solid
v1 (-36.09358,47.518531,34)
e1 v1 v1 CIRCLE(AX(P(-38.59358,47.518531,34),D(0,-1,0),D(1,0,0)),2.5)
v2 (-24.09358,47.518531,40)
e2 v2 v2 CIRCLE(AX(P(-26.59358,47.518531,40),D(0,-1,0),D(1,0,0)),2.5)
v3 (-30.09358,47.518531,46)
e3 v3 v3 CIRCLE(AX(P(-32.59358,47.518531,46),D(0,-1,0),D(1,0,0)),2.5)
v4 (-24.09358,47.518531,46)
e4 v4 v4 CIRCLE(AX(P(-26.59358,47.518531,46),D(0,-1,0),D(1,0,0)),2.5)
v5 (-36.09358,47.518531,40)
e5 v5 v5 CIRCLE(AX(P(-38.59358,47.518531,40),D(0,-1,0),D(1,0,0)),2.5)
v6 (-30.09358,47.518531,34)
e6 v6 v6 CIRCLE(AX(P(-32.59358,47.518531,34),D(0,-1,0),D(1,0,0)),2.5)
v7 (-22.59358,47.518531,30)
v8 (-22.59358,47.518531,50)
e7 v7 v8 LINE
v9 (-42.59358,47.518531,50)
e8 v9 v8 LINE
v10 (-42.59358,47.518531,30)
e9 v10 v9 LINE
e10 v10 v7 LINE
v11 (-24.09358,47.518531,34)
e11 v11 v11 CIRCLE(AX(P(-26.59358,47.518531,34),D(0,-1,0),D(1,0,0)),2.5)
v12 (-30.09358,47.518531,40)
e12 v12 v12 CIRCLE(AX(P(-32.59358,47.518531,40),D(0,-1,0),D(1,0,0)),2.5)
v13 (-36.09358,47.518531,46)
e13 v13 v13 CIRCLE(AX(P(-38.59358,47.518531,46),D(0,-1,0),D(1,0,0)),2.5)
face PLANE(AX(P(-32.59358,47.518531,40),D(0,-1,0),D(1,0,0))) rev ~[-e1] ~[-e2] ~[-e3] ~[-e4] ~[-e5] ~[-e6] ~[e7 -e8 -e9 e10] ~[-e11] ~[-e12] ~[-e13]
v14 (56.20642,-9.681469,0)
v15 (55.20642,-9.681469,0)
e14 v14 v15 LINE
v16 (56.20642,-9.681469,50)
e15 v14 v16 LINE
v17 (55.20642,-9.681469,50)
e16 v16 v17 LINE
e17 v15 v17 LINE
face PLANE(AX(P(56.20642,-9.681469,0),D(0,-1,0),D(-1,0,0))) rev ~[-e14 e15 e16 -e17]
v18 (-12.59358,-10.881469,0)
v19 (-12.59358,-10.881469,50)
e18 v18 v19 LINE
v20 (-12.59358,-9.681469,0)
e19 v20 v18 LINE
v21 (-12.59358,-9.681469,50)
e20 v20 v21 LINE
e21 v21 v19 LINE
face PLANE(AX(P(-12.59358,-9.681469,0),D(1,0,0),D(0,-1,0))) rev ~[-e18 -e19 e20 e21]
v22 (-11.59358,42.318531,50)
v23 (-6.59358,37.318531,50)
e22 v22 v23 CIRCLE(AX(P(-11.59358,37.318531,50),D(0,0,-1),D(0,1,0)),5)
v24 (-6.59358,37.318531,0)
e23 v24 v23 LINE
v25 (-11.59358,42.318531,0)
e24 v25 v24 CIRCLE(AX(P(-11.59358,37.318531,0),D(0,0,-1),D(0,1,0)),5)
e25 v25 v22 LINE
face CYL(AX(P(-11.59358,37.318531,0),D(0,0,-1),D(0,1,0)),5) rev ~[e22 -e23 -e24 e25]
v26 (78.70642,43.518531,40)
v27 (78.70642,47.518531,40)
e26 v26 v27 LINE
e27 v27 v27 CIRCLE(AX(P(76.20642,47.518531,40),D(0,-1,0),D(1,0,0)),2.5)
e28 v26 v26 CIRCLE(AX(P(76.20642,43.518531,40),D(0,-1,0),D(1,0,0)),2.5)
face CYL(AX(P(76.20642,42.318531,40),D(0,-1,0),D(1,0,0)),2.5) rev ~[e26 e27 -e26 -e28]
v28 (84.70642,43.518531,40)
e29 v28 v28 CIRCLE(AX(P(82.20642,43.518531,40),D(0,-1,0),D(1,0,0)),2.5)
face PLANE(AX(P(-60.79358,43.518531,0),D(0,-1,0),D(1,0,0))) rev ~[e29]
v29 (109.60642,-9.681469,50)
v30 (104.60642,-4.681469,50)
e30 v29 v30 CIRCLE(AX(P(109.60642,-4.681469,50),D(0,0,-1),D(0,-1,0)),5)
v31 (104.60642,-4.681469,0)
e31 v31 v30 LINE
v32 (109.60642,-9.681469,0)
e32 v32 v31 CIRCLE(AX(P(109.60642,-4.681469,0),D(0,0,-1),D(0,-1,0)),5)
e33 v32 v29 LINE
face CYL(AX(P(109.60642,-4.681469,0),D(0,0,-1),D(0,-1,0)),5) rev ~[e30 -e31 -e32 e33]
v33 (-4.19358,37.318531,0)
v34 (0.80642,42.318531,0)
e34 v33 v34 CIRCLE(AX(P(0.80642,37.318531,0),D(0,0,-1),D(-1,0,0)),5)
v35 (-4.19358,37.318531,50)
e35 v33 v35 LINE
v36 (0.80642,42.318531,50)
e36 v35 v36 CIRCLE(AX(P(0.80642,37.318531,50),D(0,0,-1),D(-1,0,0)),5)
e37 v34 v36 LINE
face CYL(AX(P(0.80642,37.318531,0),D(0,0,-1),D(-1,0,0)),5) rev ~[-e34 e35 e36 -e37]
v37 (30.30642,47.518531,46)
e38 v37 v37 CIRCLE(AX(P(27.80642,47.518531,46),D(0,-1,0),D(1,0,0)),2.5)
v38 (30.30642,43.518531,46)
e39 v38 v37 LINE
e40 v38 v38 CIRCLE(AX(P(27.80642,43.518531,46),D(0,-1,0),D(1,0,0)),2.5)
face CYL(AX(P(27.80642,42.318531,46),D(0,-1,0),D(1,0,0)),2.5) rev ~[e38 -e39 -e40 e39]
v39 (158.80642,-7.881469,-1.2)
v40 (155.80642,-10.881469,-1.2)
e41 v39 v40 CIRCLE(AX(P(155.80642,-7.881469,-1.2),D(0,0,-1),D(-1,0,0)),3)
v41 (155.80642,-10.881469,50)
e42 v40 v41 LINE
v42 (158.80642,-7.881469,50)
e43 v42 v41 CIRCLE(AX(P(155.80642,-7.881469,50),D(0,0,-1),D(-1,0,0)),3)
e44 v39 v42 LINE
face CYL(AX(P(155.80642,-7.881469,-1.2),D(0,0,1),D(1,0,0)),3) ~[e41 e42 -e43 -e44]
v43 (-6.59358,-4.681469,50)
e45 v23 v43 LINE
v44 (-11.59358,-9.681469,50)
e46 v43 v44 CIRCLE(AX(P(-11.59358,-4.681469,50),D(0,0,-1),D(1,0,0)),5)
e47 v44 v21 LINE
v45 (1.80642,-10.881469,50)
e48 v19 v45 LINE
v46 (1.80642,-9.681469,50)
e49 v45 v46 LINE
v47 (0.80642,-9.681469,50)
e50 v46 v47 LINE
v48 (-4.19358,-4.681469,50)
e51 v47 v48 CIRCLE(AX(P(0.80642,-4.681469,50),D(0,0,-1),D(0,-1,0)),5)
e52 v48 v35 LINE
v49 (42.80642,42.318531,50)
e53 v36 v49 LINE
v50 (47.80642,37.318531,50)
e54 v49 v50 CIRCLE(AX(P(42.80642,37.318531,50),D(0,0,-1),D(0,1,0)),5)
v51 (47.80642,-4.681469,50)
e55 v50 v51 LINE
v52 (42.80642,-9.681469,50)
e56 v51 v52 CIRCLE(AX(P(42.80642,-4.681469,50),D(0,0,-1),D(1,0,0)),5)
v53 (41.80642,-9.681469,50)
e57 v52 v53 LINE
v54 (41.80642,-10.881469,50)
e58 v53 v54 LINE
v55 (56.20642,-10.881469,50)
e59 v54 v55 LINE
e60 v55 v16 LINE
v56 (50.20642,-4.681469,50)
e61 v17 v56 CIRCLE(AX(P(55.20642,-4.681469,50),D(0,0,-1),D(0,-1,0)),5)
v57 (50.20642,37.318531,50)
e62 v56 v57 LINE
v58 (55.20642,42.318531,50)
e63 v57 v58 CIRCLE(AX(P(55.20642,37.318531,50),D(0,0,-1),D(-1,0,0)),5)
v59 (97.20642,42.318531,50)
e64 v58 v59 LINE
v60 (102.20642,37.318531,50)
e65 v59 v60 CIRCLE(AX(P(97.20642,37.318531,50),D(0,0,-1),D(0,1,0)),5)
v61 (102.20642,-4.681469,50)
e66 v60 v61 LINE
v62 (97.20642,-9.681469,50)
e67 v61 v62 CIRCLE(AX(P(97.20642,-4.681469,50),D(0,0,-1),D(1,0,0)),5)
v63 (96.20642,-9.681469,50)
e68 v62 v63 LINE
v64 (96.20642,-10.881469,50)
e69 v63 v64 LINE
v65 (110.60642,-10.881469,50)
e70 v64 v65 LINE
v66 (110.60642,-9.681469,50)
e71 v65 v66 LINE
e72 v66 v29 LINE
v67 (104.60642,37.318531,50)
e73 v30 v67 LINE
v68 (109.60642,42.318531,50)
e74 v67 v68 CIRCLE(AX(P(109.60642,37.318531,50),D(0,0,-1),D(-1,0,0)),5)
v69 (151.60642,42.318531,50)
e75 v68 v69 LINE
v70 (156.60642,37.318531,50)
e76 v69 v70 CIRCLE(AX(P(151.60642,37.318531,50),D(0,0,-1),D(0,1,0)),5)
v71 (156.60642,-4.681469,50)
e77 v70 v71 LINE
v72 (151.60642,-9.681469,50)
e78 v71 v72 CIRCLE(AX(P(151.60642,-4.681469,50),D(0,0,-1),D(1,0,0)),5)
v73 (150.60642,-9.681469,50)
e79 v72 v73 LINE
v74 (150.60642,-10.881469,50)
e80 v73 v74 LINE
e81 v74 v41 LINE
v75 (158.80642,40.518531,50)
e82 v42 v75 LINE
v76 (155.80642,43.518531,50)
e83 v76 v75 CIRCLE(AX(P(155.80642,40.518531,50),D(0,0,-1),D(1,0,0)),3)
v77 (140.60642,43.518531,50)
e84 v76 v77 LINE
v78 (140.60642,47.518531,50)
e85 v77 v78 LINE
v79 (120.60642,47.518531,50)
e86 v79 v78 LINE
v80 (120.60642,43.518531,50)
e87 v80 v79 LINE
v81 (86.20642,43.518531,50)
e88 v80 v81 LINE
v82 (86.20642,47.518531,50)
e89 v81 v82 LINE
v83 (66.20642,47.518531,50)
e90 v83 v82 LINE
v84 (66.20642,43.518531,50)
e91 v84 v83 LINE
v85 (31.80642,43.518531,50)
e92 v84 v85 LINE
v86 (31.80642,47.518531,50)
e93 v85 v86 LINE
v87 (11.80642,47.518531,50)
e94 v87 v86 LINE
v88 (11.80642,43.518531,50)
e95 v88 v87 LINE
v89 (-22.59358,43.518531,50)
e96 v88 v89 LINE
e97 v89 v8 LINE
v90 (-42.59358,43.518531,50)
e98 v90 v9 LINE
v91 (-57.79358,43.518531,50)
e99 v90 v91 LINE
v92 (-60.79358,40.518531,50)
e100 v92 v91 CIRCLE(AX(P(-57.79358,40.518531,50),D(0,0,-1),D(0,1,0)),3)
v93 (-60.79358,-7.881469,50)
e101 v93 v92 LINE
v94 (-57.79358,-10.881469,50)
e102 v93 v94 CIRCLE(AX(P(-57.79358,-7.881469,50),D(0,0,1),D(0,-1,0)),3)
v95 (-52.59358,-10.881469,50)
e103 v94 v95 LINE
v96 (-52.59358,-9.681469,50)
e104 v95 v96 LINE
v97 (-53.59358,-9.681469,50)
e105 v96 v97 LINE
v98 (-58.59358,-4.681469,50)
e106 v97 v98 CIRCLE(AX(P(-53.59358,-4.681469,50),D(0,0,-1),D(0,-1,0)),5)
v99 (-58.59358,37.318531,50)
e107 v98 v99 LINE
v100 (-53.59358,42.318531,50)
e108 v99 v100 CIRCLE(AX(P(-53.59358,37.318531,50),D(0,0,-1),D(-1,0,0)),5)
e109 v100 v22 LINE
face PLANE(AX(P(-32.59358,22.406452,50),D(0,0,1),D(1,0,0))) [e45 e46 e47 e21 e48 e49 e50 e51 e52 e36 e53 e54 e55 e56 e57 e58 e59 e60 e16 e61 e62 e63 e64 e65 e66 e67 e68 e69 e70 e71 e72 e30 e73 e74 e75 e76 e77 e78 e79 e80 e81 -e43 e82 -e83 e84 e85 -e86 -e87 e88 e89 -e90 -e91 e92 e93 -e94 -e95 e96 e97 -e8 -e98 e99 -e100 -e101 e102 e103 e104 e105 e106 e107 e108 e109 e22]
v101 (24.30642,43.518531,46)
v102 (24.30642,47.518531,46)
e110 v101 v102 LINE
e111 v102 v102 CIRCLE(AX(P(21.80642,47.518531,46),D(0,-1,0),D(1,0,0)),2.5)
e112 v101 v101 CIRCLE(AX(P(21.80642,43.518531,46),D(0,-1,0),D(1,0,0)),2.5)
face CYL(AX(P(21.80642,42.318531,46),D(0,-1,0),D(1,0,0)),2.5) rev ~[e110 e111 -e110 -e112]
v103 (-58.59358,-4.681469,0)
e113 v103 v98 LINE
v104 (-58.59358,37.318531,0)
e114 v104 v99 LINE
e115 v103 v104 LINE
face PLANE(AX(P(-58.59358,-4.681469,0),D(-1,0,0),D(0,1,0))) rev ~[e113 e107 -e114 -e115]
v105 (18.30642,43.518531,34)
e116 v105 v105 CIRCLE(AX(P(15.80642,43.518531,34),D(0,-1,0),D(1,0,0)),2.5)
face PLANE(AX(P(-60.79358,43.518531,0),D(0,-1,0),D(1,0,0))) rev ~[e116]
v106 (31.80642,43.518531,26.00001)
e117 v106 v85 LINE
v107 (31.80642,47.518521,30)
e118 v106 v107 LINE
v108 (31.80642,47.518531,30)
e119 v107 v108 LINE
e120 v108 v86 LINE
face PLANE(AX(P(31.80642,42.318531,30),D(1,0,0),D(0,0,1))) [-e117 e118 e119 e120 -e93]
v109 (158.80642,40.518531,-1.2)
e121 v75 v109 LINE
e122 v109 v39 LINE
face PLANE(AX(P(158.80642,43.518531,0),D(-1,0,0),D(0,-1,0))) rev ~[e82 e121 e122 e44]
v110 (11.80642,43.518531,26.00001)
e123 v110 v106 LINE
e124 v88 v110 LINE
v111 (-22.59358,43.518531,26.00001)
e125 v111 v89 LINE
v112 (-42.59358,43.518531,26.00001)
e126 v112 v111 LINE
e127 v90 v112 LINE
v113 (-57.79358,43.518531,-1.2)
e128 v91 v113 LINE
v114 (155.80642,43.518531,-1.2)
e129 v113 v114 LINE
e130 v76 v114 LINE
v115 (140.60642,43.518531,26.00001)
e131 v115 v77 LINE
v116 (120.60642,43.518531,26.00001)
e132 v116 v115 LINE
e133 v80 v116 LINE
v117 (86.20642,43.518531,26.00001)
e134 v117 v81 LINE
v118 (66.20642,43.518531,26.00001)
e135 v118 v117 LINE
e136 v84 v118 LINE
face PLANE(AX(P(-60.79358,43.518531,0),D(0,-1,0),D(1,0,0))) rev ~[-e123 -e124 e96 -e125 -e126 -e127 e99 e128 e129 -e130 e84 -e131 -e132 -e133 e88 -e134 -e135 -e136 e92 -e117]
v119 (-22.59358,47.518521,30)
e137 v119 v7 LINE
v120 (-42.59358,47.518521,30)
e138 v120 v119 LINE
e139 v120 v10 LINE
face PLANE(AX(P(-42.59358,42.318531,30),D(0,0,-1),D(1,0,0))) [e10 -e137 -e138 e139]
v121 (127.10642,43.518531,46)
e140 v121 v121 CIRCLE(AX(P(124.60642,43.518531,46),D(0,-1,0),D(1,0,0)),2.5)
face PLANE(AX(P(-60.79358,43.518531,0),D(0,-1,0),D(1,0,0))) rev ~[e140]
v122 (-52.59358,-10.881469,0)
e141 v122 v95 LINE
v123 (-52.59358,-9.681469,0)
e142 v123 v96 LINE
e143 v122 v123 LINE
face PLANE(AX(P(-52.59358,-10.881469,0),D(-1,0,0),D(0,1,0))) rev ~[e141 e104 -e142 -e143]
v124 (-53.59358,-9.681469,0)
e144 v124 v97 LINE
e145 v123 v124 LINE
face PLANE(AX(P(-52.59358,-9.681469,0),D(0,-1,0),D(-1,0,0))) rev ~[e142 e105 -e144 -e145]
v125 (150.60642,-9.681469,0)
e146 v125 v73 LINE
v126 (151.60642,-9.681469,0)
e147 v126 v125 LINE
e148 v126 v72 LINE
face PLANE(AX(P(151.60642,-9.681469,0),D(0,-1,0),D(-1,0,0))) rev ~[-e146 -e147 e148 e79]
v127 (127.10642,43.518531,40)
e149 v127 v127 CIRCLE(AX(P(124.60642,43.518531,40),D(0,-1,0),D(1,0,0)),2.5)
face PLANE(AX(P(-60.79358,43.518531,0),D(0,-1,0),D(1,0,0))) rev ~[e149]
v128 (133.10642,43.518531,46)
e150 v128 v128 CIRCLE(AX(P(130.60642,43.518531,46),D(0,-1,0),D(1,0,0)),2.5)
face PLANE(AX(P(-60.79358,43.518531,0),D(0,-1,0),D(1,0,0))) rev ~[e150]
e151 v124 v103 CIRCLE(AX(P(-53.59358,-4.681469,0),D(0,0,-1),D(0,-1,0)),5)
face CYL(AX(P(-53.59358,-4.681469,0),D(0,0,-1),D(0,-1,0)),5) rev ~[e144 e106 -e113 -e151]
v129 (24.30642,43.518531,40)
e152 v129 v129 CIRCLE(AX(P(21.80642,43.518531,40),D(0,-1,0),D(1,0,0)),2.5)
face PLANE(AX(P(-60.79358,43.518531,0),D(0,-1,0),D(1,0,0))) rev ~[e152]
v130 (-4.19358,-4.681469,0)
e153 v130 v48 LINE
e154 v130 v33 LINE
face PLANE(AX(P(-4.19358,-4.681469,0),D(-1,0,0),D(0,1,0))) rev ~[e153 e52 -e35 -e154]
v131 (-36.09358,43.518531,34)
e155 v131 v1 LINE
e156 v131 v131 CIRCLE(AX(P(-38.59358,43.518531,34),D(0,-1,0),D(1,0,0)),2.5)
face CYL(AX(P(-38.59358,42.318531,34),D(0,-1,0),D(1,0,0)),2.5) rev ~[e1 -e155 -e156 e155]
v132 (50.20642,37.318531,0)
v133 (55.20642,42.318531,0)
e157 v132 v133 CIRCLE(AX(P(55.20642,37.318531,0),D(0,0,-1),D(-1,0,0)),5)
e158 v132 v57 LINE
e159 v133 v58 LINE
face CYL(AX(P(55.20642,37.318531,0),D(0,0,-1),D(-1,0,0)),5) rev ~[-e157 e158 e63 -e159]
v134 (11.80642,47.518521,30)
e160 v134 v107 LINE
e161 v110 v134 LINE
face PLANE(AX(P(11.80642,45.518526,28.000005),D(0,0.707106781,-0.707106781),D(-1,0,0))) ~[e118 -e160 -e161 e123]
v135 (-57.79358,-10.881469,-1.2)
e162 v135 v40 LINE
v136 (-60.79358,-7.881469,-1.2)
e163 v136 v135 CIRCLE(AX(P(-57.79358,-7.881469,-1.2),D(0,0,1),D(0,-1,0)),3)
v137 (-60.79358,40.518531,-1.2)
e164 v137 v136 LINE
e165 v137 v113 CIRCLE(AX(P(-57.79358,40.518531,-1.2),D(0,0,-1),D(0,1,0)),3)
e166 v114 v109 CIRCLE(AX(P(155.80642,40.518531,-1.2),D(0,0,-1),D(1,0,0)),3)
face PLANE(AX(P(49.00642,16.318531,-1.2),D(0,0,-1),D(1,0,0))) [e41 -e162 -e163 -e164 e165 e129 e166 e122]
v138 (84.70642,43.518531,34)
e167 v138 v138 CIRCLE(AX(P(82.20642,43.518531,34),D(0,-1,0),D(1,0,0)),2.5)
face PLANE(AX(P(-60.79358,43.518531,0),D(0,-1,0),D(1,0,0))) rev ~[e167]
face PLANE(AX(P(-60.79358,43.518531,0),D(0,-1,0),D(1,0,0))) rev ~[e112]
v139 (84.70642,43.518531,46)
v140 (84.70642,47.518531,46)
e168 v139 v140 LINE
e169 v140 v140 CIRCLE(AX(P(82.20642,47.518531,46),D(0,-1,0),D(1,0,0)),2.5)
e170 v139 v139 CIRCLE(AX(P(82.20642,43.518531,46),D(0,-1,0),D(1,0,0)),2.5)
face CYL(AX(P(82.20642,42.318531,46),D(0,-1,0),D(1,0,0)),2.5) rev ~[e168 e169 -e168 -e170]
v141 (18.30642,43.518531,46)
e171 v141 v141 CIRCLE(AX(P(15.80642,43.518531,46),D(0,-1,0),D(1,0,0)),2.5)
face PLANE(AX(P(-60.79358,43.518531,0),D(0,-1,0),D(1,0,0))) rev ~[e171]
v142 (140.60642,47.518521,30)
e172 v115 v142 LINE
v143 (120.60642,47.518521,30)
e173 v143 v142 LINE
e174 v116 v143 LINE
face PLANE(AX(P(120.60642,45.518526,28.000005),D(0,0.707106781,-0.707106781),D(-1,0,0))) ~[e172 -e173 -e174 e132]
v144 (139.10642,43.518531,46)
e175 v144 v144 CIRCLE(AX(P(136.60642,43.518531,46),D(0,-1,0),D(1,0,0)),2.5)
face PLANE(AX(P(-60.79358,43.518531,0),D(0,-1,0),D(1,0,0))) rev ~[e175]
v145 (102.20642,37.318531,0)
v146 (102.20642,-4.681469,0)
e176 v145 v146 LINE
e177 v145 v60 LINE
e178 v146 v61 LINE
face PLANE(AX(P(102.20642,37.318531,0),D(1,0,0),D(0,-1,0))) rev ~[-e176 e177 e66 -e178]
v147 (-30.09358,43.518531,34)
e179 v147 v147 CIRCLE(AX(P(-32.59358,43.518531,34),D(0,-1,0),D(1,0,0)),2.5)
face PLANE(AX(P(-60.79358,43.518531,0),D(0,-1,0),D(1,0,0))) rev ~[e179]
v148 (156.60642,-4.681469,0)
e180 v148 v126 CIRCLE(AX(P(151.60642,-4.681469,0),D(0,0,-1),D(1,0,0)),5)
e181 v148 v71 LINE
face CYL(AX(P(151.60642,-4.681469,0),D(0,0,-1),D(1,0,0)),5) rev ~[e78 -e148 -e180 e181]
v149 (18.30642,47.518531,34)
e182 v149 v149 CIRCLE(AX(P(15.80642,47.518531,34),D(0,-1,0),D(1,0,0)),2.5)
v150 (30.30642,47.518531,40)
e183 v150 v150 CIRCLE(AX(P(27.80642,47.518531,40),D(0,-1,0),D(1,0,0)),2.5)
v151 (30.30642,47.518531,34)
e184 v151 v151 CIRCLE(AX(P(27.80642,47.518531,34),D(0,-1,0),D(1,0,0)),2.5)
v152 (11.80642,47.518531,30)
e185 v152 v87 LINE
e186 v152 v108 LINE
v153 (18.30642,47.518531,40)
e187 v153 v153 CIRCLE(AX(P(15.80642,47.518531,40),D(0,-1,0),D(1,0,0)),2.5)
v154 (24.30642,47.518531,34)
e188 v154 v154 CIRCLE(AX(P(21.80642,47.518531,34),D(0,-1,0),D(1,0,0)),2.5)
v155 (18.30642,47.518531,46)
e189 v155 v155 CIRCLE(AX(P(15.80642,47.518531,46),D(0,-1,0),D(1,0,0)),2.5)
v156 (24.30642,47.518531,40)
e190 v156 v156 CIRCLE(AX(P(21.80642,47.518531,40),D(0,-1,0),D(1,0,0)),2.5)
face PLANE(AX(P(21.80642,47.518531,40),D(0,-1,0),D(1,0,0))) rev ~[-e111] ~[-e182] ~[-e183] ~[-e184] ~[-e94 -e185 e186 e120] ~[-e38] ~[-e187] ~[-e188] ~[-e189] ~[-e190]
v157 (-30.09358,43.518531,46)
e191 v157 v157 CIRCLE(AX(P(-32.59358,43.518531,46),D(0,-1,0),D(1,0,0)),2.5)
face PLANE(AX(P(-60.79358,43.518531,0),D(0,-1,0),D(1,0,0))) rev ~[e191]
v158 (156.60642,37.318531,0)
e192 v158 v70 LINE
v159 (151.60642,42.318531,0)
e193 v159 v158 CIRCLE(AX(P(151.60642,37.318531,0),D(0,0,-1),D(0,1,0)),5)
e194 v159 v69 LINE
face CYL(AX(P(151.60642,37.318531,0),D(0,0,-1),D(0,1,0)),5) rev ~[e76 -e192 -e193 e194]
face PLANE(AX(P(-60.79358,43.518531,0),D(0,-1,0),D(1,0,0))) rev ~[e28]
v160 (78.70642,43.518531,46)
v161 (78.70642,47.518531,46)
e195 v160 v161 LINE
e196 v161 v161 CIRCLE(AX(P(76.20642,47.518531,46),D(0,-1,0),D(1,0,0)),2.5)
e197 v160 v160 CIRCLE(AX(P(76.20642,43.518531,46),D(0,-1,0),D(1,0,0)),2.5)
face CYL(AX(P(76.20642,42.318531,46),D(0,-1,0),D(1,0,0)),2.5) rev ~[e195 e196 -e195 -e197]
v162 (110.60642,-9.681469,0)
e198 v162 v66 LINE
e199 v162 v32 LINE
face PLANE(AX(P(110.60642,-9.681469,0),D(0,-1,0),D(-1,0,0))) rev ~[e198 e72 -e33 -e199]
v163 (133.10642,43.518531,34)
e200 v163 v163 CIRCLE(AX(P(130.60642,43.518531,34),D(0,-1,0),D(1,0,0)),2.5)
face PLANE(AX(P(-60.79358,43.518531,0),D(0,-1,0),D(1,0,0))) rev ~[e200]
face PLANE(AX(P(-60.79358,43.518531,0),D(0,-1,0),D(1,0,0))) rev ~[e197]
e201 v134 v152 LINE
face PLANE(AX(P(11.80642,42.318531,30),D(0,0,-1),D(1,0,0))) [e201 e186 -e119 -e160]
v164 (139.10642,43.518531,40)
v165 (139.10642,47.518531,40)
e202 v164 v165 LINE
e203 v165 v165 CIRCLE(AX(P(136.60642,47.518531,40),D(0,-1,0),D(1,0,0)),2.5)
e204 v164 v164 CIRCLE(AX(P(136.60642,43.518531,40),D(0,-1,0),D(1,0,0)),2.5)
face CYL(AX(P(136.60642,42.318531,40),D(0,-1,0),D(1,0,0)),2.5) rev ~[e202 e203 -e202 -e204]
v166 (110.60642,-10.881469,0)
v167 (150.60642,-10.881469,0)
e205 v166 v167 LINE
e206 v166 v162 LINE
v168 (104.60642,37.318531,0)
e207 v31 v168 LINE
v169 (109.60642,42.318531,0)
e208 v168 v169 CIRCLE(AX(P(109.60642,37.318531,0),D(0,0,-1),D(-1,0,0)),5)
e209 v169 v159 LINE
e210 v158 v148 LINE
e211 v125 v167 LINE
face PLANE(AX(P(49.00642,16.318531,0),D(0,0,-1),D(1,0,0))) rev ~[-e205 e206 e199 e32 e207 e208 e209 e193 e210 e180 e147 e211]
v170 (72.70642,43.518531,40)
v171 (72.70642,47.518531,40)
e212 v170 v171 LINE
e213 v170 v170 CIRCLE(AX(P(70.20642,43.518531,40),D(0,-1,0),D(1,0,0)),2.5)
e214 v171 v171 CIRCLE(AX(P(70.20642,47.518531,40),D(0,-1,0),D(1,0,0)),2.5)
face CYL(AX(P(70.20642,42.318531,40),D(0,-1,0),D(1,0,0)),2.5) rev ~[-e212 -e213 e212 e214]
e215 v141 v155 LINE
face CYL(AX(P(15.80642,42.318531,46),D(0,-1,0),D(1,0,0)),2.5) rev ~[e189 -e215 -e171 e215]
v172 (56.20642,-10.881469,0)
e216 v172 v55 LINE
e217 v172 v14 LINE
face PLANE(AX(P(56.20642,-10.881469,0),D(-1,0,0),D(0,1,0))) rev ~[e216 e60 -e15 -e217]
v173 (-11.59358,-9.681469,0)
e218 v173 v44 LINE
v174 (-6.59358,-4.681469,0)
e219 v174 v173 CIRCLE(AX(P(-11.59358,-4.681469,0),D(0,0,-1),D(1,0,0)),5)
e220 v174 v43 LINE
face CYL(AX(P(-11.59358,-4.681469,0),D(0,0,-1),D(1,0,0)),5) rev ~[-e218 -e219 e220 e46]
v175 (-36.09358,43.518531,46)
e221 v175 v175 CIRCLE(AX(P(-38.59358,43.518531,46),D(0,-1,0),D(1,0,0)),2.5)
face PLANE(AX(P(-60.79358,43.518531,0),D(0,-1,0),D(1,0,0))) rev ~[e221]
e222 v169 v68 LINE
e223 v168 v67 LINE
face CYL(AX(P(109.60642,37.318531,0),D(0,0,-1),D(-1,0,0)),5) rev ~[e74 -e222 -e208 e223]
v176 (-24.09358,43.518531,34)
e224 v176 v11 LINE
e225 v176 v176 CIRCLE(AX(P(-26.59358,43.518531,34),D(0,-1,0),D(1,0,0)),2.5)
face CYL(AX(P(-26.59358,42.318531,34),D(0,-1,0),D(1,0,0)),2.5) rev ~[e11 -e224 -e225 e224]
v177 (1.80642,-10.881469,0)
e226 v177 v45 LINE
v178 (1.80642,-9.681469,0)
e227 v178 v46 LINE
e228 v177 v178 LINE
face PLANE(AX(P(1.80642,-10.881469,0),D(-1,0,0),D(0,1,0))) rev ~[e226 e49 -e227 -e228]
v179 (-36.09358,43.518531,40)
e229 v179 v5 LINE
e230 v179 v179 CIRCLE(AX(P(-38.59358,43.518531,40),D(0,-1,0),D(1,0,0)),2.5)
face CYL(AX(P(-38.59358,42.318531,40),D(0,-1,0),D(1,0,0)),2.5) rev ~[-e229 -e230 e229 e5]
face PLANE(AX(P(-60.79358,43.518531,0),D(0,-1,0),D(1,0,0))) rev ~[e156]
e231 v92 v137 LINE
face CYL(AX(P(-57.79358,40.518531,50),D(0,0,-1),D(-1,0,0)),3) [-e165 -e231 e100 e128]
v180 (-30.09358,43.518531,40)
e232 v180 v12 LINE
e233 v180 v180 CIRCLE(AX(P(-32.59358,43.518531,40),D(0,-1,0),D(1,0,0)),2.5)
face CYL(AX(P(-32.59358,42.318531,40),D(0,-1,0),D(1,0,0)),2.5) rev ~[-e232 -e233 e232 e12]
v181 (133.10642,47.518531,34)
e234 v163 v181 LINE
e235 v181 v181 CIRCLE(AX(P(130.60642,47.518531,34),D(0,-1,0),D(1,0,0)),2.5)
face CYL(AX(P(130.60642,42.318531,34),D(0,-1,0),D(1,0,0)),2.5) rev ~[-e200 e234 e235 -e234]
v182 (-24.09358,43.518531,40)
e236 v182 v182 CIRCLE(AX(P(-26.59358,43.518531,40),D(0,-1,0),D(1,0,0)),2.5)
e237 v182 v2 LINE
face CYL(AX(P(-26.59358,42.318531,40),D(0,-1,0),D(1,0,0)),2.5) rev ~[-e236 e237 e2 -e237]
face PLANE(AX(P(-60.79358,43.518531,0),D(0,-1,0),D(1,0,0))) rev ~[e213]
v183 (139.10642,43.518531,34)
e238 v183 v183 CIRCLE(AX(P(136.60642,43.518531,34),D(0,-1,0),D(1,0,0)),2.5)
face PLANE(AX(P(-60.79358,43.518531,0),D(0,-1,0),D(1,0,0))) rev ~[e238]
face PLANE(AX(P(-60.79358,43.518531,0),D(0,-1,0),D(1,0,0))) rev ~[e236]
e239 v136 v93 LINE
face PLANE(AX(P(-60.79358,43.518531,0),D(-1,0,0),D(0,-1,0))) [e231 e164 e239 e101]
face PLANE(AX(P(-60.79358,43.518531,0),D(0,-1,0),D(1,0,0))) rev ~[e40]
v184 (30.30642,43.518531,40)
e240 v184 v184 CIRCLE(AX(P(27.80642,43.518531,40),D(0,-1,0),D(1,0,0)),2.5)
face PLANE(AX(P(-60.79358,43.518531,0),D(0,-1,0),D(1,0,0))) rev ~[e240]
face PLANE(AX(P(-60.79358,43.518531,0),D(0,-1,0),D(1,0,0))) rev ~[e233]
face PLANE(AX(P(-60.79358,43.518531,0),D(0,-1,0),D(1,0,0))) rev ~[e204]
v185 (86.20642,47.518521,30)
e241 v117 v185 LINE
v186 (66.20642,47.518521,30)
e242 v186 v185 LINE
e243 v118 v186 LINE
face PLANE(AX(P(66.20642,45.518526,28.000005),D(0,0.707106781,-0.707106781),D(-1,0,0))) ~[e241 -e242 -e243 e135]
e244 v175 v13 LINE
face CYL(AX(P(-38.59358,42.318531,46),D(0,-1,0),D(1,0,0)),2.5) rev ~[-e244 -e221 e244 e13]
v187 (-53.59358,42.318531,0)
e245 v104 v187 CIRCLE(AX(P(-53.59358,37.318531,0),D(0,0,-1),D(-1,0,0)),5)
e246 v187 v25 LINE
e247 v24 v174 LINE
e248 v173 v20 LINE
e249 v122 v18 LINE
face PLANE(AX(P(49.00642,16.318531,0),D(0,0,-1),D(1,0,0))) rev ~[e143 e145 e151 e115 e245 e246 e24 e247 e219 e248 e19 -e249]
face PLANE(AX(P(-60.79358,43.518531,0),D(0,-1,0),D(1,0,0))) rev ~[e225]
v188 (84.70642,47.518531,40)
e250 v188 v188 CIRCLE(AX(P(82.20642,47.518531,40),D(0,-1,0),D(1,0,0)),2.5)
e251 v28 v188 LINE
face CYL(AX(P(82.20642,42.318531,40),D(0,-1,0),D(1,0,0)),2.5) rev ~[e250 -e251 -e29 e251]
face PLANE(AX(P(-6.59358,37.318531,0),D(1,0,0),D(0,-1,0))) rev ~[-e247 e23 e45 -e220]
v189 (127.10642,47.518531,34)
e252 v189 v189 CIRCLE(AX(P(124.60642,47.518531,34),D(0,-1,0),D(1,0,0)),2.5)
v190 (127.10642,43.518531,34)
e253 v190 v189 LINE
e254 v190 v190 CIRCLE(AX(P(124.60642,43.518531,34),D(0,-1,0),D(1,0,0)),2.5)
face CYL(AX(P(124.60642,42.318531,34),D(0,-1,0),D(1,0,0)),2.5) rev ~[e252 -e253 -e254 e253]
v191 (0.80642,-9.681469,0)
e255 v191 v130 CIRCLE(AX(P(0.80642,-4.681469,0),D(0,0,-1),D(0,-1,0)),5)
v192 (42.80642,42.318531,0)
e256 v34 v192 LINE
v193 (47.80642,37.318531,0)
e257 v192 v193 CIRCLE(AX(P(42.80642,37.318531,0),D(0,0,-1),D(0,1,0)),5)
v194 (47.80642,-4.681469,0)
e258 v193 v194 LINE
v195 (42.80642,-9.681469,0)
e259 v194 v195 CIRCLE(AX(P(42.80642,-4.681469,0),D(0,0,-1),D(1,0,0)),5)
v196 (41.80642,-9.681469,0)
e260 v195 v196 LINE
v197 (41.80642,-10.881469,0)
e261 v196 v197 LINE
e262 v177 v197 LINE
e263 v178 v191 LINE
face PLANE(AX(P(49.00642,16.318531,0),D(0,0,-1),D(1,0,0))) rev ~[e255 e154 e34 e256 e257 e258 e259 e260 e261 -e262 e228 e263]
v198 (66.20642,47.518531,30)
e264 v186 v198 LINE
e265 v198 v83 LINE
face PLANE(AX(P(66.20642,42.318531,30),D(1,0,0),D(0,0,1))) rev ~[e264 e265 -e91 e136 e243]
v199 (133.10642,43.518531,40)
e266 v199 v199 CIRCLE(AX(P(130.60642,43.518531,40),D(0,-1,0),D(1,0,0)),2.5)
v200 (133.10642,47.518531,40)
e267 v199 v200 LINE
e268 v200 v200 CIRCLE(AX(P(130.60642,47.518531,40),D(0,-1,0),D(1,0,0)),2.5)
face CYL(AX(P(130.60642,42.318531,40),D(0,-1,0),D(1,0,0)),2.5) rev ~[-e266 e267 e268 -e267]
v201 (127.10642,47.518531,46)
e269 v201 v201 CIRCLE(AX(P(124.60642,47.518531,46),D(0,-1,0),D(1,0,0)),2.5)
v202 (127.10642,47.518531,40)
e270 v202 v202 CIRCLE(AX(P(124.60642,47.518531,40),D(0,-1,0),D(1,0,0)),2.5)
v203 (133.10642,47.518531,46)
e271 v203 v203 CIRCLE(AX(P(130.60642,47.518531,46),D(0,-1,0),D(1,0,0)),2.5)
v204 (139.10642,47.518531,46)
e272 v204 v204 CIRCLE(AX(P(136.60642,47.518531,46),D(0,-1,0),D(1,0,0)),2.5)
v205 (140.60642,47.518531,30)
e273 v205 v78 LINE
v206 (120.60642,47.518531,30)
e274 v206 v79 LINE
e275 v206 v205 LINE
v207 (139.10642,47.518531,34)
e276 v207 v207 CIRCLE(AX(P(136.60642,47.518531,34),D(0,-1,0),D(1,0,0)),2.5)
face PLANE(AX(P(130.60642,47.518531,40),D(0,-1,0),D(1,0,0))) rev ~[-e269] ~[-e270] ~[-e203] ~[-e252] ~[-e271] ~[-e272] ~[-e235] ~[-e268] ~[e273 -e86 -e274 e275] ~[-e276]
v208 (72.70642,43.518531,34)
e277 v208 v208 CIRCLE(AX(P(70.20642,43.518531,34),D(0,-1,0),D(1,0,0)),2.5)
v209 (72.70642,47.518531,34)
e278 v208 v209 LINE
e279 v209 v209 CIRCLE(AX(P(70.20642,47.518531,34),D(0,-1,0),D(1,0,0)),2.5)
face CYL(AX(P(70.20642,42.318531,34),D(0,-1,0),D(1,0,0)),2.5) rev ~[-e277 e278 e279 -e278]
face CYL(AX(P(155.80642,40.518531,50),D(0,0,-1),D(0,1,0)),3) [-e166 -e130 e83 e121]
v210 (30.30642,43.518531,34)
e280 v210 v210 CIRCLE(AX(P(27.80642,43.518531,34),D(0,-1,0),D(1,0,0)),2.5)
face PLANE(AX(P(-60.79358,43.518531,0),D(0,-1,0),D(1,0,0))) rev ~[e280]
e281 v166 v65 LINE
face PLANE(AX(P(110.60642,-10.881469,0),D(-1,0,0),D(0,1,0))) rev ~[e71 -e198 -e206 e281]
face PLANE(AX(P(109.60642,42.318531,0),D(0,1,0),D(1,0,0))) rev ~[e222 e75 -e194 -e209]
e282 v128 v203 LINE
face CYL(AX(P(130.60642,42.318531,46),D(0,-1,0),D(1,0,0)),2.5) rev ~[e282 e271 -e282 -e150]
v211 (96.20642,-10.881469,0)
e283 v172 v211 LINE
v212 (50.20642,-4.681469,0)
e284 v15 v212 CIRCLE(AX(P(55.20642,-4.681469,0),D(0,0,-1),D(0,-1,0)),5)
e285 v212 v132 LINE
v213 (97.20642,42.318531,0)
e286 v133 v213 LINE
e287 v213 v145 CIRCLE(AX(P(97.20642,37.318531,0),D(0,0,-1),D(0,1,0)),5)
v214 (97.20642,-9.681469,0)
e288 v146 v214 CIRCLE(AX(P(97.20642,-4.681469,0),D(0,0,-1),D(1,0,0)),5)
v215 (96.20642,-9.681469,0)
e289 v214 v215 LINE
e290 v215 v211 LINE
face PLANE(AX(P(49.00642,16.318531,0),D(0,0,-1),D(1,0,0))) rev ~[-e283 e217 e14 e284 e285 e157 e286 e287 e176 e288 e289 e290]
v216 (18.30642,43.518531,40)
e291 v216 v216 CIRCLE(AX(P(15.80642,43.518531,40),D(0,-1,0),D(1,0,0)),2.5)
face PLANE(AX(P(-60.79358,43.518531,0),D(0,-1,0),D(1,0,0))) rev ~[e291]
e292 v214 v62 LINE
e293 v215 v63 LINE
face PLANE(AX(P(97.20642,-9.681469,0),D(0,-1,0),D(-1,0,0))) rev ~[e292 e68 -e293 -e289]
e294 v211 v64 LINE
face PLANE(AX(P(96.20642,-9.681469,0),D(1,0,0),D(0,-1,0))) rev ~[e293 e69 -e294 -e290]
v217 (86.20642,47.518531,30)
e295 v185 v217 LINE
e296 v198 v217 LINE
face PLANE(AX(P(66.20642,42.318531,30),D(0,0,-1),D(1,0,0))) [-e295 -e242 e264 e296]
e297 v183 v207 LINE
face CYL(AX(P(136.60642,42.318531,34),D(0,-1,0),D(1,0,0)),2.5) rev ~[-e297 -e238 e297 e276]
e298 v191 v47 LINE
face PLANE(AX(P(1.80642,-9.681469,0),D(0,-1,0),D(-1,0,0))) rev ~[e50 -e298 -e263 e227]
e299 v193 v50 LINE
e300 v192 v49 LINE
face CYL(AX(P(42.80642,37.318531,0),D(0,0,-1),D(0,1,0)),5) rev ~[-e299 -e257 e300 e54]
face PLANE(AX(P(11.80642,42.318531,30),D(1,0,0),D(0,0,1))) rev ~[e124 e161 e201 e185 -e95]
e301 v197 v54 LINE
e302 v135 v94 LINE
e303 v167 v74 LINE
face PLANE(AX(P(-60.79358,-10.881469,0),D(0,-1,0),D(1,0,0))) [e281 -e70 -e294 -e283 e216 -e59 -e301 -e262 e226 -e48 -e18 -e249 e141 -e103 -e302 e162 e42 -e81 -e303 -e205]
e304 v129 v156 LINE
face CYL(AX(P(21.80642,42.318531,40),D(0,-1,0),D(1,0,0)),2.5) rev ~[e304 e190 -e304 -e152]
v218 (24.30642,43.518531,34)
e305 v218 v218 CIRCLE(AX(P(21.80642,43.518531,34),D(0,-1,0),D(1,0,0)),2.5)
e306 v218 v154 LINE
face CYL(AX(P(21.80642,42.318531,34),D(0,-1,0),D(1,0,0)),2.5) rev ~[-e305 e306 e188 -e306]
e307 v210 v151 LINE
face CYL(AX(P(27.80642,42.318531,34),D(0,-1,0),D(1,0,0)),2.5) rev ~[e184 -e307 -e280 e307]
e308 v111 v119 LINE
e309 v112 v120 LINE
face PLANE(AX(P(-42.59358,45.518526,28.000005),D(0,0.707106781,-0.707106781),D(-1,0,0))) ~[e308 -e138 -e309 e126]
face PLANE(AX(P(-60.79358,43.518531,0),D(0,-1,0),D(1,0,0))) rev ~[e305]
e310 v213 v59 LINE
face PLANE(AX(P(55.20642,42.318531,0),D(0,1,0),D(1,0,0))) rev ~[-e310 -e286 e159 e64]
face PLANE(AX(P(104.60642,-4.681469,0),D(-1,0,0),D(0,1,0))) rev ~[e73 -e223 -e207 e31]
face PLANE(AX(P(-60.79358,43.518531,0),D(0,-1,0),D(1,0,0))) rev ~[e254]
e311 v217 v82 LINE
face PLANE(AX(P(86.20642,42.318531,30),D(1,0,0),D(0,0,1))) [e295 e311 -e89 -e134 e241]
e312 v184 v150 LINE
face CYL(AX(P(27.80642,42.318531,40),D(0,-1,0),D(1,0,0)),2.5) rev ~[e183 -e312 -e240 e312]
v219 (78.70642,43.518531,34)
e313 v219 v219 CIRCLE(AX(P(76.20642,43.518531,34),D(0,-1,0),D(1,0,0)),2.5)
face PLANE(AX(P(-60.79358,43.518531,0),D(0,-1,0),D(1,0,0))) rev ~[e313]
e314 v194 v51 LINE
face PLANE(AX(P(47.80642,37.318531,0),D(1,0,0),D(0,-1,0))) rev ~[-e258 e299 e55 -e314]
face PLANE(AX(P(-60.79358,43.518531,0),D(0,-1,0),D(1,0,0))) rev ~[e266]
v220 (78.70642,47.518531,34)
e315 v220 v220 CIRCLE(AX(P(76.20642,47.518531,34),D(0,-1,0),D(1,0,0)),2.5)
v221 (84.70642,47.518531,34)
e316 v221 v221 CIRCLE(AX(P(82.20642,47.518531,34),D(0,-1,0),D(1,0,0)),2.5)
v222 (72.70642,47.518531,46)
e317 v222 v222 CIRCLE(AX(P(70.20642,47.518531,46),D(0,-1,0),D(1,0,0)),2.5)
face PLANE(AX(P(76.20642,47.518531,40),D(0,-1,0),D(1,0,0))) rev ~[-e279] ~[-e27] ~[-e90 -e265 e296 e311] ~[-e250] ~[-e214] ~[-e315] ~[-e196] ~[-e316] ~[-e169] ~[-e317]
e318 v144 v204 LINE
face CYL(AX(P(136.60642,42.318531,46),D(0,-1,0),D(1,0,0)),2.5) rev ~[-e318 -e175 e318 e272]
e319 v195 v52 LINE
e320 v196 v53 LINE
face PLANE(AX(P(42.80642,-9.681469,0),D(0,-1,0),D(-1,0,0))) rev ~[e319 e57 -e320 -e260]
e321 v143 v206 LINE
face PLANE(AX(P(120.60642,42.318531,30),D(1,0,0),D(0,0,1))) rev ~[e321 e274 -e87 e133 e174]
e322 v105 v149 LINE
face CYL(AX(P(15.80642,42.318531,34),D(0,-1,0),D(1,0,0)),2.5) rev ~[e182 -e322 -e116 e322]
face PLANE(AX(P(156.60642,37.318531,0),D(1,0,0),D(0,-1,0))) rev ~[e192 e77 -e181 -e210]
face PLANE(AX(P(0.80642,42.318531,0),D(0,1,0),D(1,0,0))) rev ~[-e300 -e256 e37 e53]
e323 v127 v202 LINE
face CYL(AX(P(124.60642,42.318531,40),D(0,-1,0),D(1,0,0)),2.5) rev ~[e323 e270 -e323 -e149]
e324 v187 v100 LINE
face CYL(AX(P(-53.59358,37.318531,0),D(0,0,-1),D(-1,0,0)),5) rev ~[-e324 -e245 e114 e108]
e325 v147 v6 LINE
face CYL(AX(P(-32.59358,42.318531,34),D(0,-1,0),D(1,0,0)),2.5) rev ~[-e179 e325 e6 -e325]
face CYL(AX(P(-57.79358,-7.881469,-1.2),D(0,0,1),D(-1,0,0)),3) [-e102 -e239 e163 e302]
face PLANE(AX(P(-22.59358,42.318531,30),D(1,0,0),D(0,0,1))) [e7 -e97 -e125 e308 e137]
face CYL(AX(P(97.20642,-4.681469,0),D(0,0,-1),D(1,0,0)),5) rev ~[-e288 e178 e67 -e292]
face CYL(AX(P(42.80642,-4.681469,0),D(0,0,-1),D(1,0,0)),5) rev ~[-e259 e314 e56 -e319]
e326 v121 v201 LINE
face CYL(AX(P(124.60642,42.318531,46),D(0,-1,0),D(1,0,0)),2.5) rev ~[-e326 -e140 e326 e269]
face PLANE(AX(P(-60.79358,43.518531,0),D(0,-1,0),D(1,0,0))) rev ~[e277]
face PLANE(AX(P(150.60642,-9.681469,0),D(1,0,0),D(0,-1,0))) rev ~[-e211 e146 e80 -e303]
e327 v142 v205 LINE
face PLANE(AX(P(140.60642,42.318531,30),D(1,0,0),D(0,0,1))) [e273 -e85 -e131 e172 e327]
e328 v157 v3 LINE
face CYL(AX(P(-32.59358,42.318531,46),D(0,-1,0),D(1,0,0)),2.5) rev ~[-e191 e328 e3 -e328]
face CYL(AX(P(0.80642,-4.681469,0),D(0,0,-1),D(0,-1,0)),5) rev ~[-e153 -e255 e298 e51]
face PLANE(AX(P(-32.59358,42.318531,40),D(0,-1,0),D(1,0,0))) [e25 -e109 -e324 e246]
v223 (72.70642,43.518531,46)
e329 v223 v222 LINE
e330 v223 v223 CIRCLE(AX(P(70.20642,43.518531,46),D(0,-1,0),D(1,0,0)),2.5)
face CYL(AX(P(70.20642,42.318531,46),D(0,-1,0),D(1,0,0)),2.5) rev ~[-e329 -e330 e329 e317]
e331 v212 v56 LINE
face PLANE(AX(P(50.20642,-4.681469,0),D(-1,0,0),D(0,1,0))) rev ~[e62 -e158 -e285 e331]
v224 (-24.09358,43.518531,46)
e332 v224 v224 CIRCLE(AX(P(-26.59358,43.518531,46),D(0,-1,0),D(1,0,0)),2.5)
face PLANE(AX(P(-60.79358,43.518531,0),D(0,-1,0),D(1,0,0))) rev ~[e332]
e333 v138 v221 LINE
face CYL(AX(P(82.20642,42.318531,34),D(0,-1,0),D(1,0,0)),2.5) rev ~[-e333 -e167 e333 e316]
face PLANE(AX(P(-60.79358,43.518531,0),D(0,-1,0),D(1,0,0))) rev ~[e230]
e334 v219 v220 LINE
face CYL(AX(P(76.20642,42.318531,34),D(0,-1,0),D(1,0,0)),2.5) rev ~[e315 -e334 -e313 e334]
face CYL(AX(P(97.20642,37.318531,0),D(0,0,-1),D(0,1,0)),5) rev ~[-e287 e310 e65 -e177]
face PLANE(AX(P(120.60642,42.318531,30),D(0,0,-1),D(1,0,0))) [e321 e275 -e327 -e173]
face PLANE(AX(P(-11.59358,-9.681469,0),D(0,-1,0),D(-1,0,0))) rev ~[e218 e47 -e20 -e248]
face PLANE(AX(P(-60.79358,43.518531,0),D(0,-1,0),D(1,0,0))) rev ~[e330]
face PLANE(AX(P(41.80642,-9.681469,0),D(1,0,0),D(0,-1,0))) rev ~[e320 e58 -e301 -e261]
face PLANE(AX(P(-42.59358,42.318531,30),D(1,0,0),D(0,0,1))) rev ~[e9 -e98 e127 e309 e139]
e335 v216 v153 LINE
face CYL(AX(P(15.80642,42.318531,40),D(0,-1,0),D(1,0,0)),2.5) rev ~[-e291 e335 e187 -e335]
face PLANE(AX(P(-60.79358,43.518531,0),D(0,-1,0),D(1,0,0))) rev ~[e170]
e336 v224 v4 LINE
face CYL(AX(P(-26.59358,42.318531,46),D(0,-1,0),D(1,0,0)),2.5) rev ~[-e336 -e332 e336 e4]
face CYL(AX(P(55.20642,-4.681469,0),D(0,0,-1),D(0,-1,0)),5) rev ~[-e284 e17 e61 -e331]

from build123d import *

# Parameters (mm, degrees)
F0_W     = 1
F0_H     = 54.4
F1_DEPTH = 50
F2_W     = 219.6
F2_H     = 54.4
F3_DEPTH = 1.2
F4_W     = 20
F4_H     = 20
F4_R     = 2.5
F5_DEPTH = 5.2
F6_R     = 3
F7_SIZE  = 3.99999


# Not quite as in the source:
# - a fillet or chamfer is up to 0.001 mm smaller than in the source, because OpenCascade refuses the exact size


with BuildPart() as f1:
    # F0 (on Top) → F1 (new body)
    with BuildSketch(Plane.XY):
        with BuildLine():
            Line((-52.5935795337, -9.6814689702), (-53.5935795337, -9.6814689702))
            ThreePointArc((-53.5935795337, -9.6814689702), (-57.1291134396, -8.2170028761), (-58.5935795337, -4.6814689702))
            Line((-58.5935795337, -4.6814689702), (-58.5935795337, 37.3185310298))
            ThreePointArc((-58.5935795337, 37.3185310298), (-57.1291134396, 40.8540649358), (-53.5935795337, 42.3185310298))
            Line((-53.5935795337, 42.3185310298), (-11.5935795337, 42.3185310298))
            ThreePointArc((-11.5935795337, 42.3185310298), (-8.0580456278, 40.8540649358), (-6.5935795337, 37.3185310298))
            Line((-6.5935795337, 37.3185310298), (-6.5935795337, -4.6814689702))
            ThreePointArc((-6.5935795337, -4.6814689702), (-8.0580456278, -8.2170028761), (-11.5935795337, -9.6814689702))
            Line((-11.5935795337, -9.6814689702), (-12.5935795337, -9.6814689702))
            Line((-12.5935795337, -9.6814689702), (-12.5935795337, -10.8814689702))
            Line((-12.5935795337, -10.8814689702), (-5.3935795337, -10.8814689702))
            Line((-5.3935795337, -10.8814689702), (-5.3935795337, 43.5185310298))
            Line((-5.3935795337, 43.5185310298), (-59.7935795337, 43.5185310298))
            Line((-59.7935795337, 43.5185310298), (-59.7935795337, -10.8814689702))
            Line((-59.7935795337, -10.8814689702), (-52.5935795337, -10.8814689702))
            Line((-52.5935795337, -10.8814689702), (-52.5935795337, -9.6814689702))
        make_face()
        with Locations((-60.2935795337, 16.3185310298)):
            Rectangle(F0_W, F0_H)
        with BuildLine():
            Line((49.0064204663, 43.5185310298), (-5.3935795337, 43.5185310298))
            Line((-5.3935795337, 43.5185310298), (-5.3935795337, -10.8814689702))
            Line((-5.3935795337, -10.8814689702), (1.8064204663, -10.8814689702))
            Line((1.8064204663, -10.8814689702), (1.8064204663, -9.6814689702))
            Line((1.8064204663, -9.6814689702), (0.8064204663, -9.6814689702))
            ThreePointArc((0.8064204663, -9.6814689702), (-2.7291134396, -8.2170028761), (-4.1935795337, -4.6814689702))
            Line((-4.1935795337, -4.6814689702), (-4.1935795337, 37.3185310298))
            ThreePointArc((-4.1935795337, 37.3185310298), (-2.7291134396, 40.8540649358), (0.8064204663, 42.3185310298))
            Line((0.8064204663, 42.3185310298), (42.8064204663, 42.3185310298))
            ThreePointArc((42.8064204663, 42.3185310298), (46.3419543722, 40.8540649358), (47.8064204663, 37.3185310298))
            Line((47.8064204663, 37.3185310298), (47.8064204663, -4.6814689702))
            ThreePointArc((47.8064204663, -4.6814689702), (46.3419543722, -8.2170028761), (42.8064204663, -9.6814689702))
            Line((42.8064204663, -9.6814689702), (41.8064204663, -9.6814689702))
            Line((41.8064204663, -9.6814689702), (41.8064204663, -10.8814689702))
            Line((41.8064204663, -10.8814689702), (49.0064204663, -10.8814689702))
            Line((49.0064204663, -10.8814689702), (49.0064204663, 43.5185310298))
        make_face()
        with BuildLine():
            Line((103.4064204663, 43.5185310298), (49.0064204663, 43.5185310298))
            Line((49.0064204663, 43.5185310298), (49.0064204663, -10.8814689702))
            Line((49.0064204663, -10.8814689702), (56.2064204663, -10.8814689702))
            Line((56.2064204663, -10.8814689702), (56.2064204663, -9.6814689702))
            Line((56.2064204663, -9.6814689702), (55.2064204663, -9.6814689702))
            ThreePointArc((55.2064204663, -9.6814689702), (51.6708865604, -8.2170028761), (50.2064204663, -4.6814689702))
            Line((50.2064204663, -4.6814689702), (50.2064204663, 37.3185310298))
            ThreePointArc((50.2064204663, 37.3185310298), (51.6708865604, 40.8540649358), (55.2064204663, 42.3185310298))
            Line((55.2064204663, 42.3185310298), (97.2064204663, 42.3185310298))
            ThreePointArc((97.2064204663, 42.3185310298), (100.7419543722, 40.8540649358), (102.2064204663, 37.3185310298))
            Line((102.2064204663, 37.3185310298), (102.2064204663, -4.6814689702))
            ThreePointArc((102.2064204663, -4.6814689702), (100.7419543722, -8.2170028761), (97.2064204663, -9.6814689702))
            Line((97.2064204663, -9.6814689702), (96.2064204663, -9.6814689702))
            Line((96.2064204663, -9.6814689702), (96.2064204663, -10.8814689702))
            Line((96.2064204663, -10.8814689702), (103.4064204663, -10.8814689702))
            Line((103.4064204663, -10.8814689702), (103.4064204663, 43.5185310298))
        make_face()
        with BuildLine():
            Line((157.8064204663, 43.5185310298), (103.4064204663, 43.5185310298))
            Line((103.4064204663, 43.5185310298), (103.4064204663, -10.8814689702))
            Line((103.4064204663, -10.8814689702), (110.6064204663, -10.8814689702))
            Line((110.6064204663, -10.8814689702), (110.6064204663, -9.6814689702))
            Line((110.6064204663, -9.6814689702), (109.6064204663, -9.6814689702))
            ThreePointArc((109.6064204663, -9.6814689702), (106.0708865604, -8.2170028761), (104.6064204663, -4.6814689702))
            Line((104.6064204663, -4.6814689702), (104.6064204663, 37.3185310298))
            ThreePointArc((104.6064204663, 37.3185310298), (106.0708865604, 40.8540649358), (109.6064204663, 42.3185310298))
            Line((109.6064204663, 42.3185310298), (151.6064204663, 42.3185310298))
            ThreePointArc((151.6064204663, 42.3185310298), (155.1419543722, 40.8540649358), (156.6064204663, 37.3185310298))
            Line((156.6064204663, 37.3185310298), (156.6064204663, -4.6814689702))
            ThreePointArc((156.6064204663, -4.6814689702), (155.1419543722, -8.2170028761), (151.6064204663, -9.6814689702))
            Line((151.6064204663, -9.6814689702), (150.6064204663, -9.6814689702))
            Line((150.6064204663, -9.6814689702), (150.6064204663, -10.8814689702))
            Line((150.6064204663, -10.8814689702), (157.8064204663, -10.8814689702))
            Line((157.8064204663, -10.8814689702), (157.8064204663, 43.5185310298))
        make_face()
        with Locations((158.3064204663, 16.3185310298)):
            Rectangle(F0_W, F0_H)
    extrude(amount=F1_DEPTH)

    # F2 (on face) → F3 (join)
    with BuildSketch(Plane(origin=(0, 0, 0), x_dir=(1, 0, 0), z_dir=(0, 0, -1))):
        with Locations((49.0064204663, -16.3185310298)):
            Rectangle(F2_W, F2_H)
    extrude(amount=F3_DEPTH)

    # F4 (on face) → F5 (join)
    with BuildSketch(Plane.XZ.offset(-42.3185310298)):
        with Locations((-32.5935795337, 40)):
            Rectangle(F4_W, F4_H)
        with Locations((-38.5935795337, 34)):
            Circle(F4_R, mode=Mode.SUBTRACT)
        with Locations((-32.5935795337, 34)):
            Circle(F4_R, mode=Mode.SUBTRACT)
        with Locations((-26.5935795337, 34)):
            Circle(F4_R, mode=Mode.SUBTRACT)
        with Locations((-38.5935795337, 40)):
            Circle(F4_R, mode=Mode.SUBTRACT)
        with Locations((-32.5935795337, 40)):
            Circle(F4_R, mode=Mode.SUBTRACT)
        with Locations((-26.5935795337, 40)):
            Circle(F4_R, mode=Mode.SUBTRACT)
        with Locations((-38.5935795337, 46)):
            Circle(F4_R, mode=Mode.SUBTRACT)
        with Locations((-32.5935795337, 46)):
            Circle(F4_R, mode=Mode.SUBTRACT)
        with Locations((-26.5935795337, 46)):
            Circle(F4_R, mode=Mode.SUBTRACT)
        with Locations((21.8064204663, 40)):
            Rectangle(F4_W, F4_H)
        with Locations((15.8064204663, 34)):
            Circle(F4_R, mode=Mode.SUBTRACT)
        with Locations((21.8064204663, 34)):
            Circle(F4_R, mode=Mode.SUBTRACT)
        with Locations((27.8064204663, 34)):
            Circle(F4_R, mode=Mode.SUBTRACT)
        with Locations((15.8064204663, 40)):
            Circle(F4_R, mode=Mode.SUBTRACT)
        with Locations((21.8064204663, 40)):
            Circle(F4_R, mode=Mode.SUBTRACT)
        with Locations((27.8064204663, 40)):
            Circle(F4_R, mode=Mode.SUBTRACT)
        with Locations((15.8064204663, 46)):
            Circle(F4_R, mode=Mode.SUBTRACT)
        with Locations((21.8064204663, 46)):
            Circle(F4_R, mode=Mode.SUBTRACT)
        with Locations((27.8064204663, 46)):
            Circle(F4_R, mode=Mode.SUBTRACT)
        with Locations((76.2064204663, 40)):
            Rectangle(F4_W, F4_H)
        with Locations((70.2064204663, 34)):
            Circle(F4_R, mode=Mode.SUBTRACT)
        with Locations((76.2064204663, 34)):
            Circle(F4_R, mode=Mode.SUBTRACT)
        with Locations((82.2064204663, 34)):
            Circle(F4_R, mode=Mode.SUBTRACT)
        with Locations((70.2064204663, 40)):
            Circle(F4_R, mode=Mode.SUBTRACT)
        with Locations((76.2064204663, 40)):
            Circle(F4_R, mode=Mode.SUBTRACT)
        with Locations((82.2064204663, 40)):
            Circle(F4_R, mode=Mode.SUBTRACT)
        with Locations((70.2064204663, 46)):
            Circle(F4_R, mode=Mode.SUBTRACT)
        with Locations((76.2064204663, 46)):
            Circle(F4_R, mode=Mode.SUBTRACT)
        with Locations((82.2064204663, 46)):
            Circle(F4_R, mode=Mode.SUBTRACT)
        with Locations((130.6064204663, 40)):
            Rectangle(F4_W, F4_H)
        with Locations((124.6064204663, 34)):
            Circle(F4_R, mode=Mode.SUBTRACT)
        with Locations((130.6064204663, 34)):
            Circle(F4_R, mode=Mode.SUBTRACT)
        with Locations((136.6064204663, 34)):
            Circle(F4_R, mode=Mode.SUBTRACT)
        with Locations((124.6064204663, 40)):
            Circle(F4_R, mode=Mode.SUBTRACT)
        with Locations((130.6064204663, 40)):
            Circle(F4_R, mode=Mode.SUBTRACT)
        with Locations((136.6064204663, 40)):
            Circle(F4_R, mode=Mode.SUBTRACT)
        with Locations((124.6064204663, 46)):
            Circle(F4_R, mode=Mode.SUBTRACT)
        with Locations((130.6064204663, 46)):
            Circle(F4_R, mode=Mode.SUBTRACT)
        with Locations((136.6064204663, 46)):
            Circle(F4_R, mode=Mode.SUBTRACT)
    extrude(amount=-F5_DEPTH)

    # F6
    f6_edges = [f1.edges().sort_by_distance(p)[0] for p in [
        (-60.79358, -10.881469, 24.4),
        (158.80642, -10.881469, 24.4),
        (-60.79358, 43.518531, 24.4),
        (158.80642, 43.518531, 24.4),
    ]]
    fillet(f6_edges, radius=F6_R)

    # F7 (size 4 in the source; OpenCascade refuses exactly that, so slightly less here)
    f7_edges = [f1.edges().sort_by_distance(p)[0] for p in [
        (130.60642, 43.518531, 30),
        (76.20642, 43.518531, 30),
        (21.80642, 43.518531, 30),
        (-32.59358, 43.518531, 30),
    ]]
    chamfer(f7_edges, length=F7_SIZE)


solid = f1.part
